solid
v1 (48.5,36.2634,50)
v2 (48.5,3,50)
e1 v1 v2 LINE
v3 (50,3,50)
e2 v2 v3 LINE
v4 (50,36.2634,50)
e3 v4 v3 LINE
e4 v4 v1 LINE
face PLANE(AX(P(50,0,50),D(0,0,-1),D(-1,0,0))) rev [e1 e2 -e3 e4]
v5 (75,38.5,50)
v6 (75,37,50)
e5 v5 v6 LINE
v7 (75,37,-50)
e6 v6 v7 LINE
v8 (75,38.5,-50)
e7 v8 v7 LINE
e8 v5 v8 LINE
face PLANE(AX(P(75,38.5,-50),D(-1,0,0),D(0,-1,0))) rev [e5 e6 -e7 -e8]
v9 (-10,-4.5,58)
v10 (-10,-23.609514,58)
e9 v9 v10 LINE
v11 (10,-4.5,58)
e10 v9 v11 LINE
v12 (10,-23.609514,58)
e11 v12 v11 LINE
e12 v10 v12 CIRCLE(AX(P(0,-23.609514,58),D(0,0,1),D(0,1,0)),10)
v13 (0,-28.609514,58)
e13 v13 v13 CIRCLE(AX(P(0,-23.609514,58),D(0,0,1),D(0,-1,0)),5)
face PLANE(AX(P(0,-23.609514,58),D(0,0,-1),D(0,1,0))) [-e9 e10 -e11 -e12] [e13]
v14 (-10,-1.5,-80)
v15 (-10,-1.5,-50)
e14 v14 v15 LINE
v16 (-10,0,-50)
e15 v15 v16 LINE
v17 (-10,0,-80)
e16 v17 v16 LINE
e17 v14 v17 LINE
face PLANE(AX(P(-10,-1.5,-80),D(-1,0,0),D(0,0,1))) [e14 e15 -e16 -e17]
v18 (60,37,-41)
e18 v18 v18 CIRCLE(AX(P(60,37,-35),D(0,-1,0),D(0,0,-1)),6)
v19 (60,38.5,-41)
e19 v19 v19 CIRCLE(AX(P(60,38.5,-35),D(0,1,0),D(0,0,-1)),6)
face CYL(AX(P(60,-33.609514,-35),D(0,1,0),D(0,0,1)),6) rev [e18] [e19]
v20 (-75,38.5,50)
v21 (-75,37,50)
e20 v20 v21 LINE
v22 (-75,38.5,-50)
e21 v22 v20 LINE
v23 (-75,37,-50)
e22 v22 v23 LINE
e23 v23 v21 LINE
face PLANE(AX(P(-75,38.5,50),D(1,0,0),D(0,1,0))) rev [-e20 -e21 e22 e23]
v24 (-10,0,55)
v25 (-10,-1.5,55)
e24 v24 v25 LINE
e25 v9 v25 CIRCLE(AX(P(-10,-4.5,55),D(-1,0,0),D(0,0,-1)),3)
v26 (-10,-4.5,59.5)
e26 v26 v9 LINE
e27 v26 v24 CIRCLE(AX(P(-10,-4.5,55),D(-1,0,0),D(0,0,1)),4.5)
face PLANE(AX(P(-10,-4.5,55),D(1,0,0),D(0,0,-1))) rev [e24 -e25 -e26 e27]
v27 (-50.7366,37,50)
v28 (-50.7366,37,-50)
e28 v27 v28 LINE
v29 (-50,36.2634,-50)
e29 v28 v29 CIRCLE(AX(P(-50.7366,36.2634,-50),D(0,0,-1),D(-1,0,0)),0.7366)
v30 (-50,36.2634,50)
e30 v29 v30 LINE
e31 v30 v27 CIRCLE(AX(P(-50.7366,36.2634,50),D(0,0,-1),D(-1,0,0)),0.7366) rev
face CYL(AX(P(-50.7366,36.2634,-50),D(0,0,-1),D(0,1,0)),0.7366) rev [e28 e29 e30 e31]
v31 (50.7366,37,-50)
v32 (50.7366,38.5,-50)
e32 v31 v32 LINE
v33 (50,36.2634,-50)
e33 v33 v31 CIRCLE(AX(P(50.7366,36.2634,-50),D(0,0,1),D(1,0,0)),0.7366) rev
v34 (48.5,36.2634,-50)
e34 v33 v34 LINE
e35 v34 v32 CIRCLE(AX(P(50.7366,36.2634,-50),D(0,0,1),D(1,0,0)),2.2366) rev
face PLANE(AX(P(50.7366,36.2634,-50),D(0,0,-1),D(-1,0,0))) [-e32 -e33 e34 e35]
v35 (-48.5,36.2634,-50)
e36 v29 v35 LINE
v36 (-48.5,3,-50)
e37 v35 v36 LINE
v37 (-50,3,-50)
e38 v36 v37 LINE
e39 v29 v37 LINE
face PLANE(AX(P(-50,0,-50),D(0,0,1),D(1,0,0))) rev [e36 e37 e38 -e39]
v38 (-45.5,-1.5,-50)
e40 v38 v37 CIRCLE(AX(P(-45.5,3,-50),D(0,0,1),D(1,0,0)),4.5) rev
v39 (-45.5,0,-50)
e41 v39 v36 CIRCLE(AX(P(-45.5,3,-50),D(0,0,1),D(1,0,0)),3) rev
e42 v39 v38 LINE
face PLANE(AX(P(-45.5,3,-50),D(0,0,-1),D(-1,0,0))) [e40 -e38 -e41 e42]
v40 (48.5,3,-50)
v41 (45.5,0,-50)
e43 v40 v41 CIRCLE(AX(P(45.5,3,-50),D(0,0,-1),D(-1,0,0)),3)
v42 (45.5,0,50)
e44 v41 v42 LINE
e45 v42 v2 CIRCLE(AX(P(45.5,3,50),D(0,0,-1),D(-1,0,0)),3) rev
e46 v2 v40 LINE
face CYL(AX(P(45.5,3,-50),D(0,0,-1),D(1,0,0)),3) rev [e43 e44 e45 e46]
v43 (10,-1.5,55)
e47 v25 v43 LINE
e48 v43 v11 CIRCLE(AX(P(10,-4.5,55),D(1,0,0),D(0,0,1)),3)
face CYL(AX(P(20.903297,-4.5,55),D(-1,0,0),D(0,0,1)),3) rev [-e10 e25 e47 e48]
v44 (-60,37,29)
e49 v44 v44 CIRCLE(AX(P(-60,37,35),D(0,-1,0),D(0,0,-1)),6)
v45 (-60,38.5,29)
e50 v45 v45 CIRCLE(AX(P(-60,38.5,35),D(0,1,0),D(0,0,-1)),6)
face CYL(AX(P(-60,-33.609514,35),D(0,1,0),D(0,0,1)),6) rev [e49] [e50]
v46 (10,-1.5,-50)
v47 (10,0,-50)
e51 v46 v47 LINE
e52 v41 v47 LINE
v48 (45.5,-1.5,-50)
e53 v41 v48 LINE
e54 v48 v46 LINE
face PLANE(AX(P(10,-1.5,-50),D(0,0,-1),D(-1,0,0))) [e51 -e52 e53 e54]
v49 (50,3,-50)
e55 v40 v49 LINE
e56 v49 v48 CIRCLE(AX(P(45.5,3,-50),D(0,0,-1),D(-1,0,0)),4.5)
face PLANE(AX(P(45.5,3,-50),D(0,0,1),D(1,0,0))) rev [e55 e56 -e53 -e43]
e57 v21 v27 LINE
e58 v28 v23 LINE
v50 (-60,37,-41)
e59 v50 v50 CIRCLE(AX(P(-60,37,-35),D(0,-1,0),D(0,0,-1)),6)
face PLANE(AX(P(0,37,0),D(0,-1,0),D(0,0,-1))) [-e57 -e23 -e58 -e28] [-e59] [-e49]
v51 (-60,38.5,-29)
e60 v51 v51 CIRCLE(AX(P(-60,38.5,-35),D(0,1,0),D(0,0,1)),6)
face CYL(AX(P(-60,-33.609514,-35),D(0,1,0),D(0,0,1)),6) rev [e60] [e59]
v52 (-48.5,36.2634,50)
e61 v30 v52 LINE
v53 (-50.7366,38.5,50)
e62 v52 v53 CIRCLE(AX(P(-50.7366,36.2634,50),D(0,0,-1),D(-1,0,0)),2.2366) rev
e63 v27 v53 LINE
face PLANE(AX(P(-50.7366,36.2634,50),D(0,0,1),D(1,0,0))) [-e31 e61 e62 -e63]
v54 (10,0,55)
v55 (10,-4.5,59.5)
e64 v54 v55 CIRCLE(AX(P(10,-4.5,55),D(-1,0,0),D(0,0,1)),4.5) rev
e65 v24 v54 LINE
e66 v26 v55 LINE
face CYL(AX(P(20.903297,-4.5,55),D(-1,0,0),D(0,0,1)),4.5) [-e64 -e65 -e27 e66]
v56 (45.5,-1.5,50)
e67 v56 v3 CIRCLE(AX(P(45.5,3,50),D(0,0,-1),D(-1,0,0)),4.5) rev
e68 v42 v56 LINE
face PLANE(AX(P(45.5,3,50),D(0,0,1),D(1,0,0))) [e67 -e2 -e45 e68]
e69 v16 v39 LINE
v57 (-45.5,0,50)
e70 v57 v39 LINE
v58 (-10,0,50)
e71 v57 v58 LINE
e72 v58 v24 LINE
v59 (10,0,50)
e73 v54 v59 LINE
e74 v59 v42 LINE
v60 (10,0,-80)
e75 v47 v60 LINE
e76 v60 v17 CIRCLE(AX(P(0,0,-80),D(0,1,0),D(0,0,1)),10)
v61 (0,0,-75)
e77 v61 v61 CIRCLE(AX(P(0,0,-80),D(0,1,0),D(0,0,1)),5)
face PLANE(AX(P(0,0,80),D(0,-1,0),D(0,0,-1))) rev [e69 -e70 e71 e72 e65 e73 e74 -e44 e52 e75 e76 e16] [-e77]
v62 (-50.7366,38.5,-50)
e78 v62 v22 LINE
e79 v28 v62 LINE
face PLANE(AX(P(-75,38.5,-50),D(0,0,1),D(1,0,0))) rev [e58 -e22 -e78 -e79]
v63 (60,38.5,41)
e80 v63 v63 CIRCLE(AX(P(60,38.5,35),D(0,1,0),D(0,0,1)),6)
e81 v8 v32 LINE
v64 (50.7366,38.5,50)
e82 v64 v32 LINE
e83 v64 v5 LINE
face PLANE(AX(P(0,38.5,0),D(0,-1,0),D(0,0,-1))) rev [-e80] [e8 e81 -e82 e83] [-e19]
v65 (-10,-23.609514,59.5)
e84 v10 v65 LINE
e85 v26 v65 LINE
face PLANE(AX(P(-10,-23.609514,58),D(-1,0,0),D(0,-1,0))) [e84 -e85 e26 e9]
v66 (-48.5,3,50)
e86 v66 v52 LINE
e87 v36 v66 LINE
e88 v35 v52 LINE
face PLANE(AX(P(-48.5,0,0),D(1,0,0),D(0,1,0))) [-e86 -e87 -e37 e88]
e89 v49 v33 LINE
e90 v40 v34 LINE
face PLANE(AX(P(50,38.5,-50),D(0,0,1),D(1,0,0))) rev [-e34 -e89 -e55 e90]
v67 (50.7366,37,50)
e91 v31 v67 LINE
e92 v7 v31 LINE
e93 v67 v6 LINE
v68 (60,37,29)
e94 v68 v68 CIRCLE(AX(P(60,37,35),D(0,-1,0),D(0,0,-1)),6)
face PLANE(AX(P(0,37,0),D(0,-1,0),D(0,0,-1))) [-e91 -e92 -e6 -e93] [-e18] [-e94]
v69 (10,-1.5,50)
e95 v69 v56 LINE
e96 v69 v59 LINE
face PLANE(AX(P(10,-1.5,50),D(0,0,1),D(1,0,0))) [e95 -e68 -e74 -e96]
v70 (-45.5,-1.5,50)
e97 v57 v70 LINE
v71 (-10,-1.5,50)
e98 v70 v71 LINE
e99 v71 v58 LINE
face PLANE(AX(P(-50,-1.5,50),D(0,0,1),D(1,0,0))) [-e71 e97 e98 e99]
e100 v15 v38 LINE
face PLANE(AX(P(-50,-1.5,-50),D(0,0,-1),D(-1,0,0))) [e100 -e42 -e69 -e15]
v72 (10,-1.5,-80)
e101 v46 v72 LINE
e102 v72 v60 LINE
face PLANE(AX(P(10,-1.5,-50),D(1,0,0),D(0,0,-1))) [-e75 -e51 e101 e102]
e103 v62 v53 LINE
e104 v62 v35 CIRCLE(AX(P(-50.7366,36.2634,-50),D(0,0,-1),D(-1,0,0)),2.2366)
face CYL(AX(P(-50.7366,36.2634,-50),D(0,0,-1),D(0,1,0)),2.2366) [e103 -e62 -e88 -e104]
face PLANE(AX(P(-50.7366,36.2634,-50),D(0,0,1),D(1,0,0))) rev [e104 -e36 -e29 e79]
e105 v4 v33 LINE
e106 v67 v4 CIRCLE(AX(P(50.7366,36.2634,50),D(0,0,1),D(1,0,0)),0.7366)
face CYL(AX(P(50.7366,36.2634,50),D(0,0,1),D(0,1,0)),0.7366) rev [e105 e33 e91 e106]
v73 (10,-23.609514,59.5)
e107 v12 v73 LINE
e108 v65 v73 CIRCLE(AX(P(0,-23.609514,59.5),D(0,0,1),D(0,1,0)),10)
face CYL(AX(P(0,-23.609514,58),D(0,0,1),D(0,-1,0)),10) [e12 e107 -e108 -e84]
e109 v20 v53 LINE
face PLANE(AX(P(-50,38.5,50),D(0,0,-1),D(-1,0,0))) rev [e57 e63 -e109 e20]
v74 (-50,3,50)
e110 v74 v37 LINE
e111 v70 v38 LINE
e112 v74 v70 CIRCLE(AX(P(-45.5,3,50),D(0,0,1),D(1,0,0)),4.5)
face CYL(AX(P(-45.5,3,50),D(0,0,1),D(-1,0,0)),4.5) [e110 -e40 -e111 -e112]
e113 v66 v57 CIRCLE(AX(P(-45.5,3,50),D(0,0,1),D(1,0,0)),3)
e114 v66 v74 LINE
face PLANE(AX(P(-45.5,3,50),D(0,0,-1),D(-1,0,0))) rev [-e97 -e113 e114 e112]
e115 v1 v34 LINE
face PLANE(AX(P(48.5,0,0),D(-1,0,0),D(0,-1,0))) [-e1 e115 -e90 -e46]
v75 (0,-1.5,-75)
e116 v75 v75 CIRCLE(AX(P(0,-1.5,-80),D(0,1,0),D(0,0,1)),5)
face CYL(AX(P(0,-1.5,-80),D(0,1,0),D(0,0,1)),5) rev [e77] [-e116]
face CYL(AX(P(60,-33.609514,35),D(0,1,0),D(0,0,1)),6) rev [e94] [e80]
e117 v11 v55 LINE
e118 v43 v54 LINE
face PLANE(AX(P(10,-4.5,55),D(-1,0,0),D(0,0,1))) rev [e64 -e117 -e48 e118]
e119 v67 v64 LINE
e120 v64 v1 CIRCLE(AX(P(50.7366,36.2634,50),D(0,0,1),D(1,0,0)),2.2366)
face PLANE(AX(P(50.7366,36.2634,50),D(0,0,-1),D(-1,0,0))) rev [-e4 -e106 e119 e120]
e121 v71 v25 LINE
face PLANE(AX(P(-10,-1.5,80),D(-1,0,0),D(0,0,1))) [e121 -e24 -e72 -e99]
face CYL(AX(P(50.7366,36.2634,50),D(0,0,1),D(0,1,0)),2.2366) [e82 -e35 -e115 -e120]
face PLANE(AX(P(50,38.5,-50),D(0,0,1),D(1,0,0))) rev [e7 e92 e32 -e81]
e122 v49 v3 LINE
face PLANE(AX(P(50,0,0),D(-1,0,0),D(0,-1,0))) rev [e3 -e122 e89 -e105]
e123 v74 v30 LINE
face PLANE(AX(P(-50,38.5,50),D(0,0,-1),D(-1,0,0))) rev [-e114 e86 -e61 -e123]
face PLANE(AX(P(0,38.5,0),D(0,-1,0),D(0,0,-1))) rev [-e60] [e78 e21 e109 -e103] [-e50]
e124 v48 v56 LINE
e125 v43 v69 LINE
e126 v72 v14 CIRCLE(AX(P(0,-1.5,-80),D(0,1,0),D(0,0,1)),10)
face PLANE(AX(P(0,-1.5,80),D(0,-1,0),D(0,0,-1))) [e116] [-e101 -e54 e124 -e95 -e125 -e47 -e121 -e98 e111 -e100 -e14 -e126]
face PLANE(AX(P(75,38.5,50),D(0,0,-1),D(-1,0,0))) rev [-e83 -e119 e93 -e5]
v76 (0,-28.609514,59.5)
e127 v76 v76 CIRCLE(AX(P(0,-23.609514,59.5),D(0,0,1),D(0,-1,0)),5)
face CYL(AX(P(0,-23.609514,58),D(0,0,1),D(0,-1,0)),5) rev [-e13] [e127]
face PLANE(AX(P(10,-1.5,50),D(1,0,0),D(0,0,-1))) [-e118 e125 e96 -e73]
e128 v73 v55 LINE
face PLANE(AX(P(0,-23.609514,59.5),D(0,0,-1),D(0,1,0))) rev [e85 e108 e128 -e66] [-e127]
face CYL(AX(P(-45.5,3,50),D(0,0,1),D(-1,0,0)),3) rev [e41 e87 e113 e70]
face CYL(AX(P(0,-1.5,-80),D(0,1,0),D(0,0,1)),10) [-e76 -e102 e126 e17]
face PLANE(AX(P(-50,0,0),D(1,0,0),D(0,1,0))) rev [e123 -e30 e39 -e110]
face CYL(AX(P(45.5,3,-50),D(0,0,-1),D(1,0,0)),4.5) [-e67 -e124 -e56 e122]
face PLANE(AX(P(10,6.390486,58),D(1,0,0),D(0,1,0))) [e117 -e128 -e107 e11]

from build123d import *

# Parameters (mm, degrees)
SCHIZZO1_R                           = 5
BASE_FLANGIA1_DEPTH                  = 1.5
BORDO_FLANGIA1_STRIP_W               = 12
BORDO_FLANGIA1_STRIP_H               = 1.5
BORDO_FLANGIA1_STRIP_CUT_DEPTH       = 100
BORDO_FLANGIA1_STRIP_2_W             = 12
BORDO_FLANGIA1_STRIP_2_H             = 1.5
BORDO_FLANGIA1_STRIP_CUT_2_DEPTH     = 100
BORDO_FLANGIA1_DEPTH                 = 100
BORDO_FLANGIA1_BEND_DEPTH            = 100
BORDO_FLANGIA2_STRIP_W               = 7.4732
BORDO_FLANGIA2_STRIP_H               = 1.5
BORDO_FLANGIA2_STRIP_CUT_DEPTH       = 100
BORDO_FLANGIA2_STRIP_2_W             = 7.4732
BORDO_FLANGIA2_STRIP_2_H             = 1.5
BORDO_FLANGIA2_STRIP_CUT_2_DEPTH     = 100
BORDO_FLANGIA2_DEPTH                 = 100
BORDO_FLANGIA2_BEND_DEPTH            = 100
PIEGATURA_START                      = 58.9178
PIEGATURA_DELLO_SCHIZZO1_OUTLINE_W   = 20
PIEGATURA_DELLO_SCHIZZO1_OUTLINE_H   = 1.5
PIEGATURA_DELLO_SCHIZZO1_DEPTH       = 32.0822
PIEGATURA_START_2                    = 56.266894772
PIEGATURA_DELLO_SCHIZZO1_2_OUTLINE_R = 5
PIEGATURA_DELLO_SCHIZZO1_2_DEPTH     = 3.233105228
PIEGATURA_START_3                    = -10
PIEGATURA_DELLO_SCHIZZO1_3_DEPTH     = 20
PIEGATURA_DELLO_SCHIZZO1_4_DEPTH     = 20
SCHIZZO19_R                          = 6
TAGLIO_ESTRUSIONE1_DEPTH             = 138.567372501


with BuildPart() as part:
    # Base-Flangia1: sheet metal written as solids
    # Schizzo1 → Base-Flangia1 (new body)
    with BuildSketch(Plane(origin=(0, 0, 0), x_dir=(1, 0, 0), z_dir=(0, 1, 0))):
        with BuildLine():
            Line((10, 50), (10, 80))
            ThreePointArc((10, 80), (0, 90), (-10, 80))
            Line((-10, 80), (-10, 50))
            Line((-10, 50), (-50, 50))
            Line((-50, 50), (-50, -50))
            Line((-50, -50), (-10, -50))
            Line((-10, -50), (-10, -80))
            ThreePointArc((-10, -80), (0, -90), (10, -80))
            Line((10, -80), (10, -50))
            Line((10, -50), (50, -50))
            Line((50, -50), (50, 50))
            Line((50, 50), (10, 50))
        make_face()
        with Locations(Location((0, 80, 0), (0, 0, 270))):
            Circle(SCHIZZO1_R, mode=Mode.SUBTRACT)
        with Locations(Location((0, -80, 0), (0, 0, 270))):
            Circle(SCHIZZO1_R, mode=Mode.SUBTRACT)
    extrude(amount=-BASE_FLANGIA1_DEPTH)

    # Bordo-Flangia1: sheet metal written as solids
    # Bordo-Flangia1 strip (on a plane across the edge) → Bordo-Flangia1 strip cut (cut)
    with BuildSketch(Plane(origin=(-50, 0, -50), x_dir=(1, 0, 0), z_dir=(0, 0, 1))):
        with Locations((-1.5, -0.75)):
            Rectangle(BORDO_FLANGIA1_STRIP_W, BORDO_FLANGIA1_STRIP_H)
    extrude(amount=BORDO_FLANGIA1_STRIP_CUT_DEPTH, mode=Mode.SUBTRACT)

    # Bordo-Flangia1 strip 2 (on a plane across the edge) → Bordo-Flangia1 strip cut 2 (cut)
    with BuildSketch(Plane(origin=(50, 0, 50), x_dir=(-1, 0, 0), z_dir=(0, 0, -1))):
        with Locations((-1.5, -0.75)):
            Rectangle(BORDO_FLANGIA1_STRIP_2_W, BORDO_FLANGIA1_STRIP_2_H)
    extrude(amount=BORDO_FLANGIA1_STRIP_CUT_2_DEPTH, mode=Mode.SUBTRACT)

    # Bordo-Flangia1 section (on a plane across the edge) → Bordo-Flangia1 (add)
    with BuildSketch(Plane(origin=(-50, 0, -50), x_dir=(1, 0, 0), z_dir=(0, 0, 1))):
        with BuildLine():
            Line((0, 3), (0, 38.5))
            Line((0, 38.5), (1.5, 38.5))
            Line((1.5, 38.5), (1.5, 3))
            ThreePointArc((1.5, 3), (2.378679656, 0.878679656), (4.5, 0))
            Line((4.5, 0), (4.5, -1.5))
            ThreePointArc((4.5, -1.5), (1.318019485, -0.181980515), (0, 3))
        make_face()
    extrude(amount=BORDO_FLANGIA1_DEPTH)

    # Bordo-Flangia1 section 2 (on a plane across the edge) → Bordo-Flangia1 bend (add)
    with BuildSketch(Plane(origin=(50, 0, 50), x_dir=(-1, 0, 0), z_dir=(0, 0, -1))):
        with BuildLine():
            Line((0, 3), (0, 38.5))
            Line((0, 38.5), (1.5, 38.5))
            Line((1.5, 38.5), (1.5, 3))
            ThreePointArc((1.5, 3), (2.378679656, 0.878679656), (4.5, 0))
            Line((4.5, 0), (4.5, -1.5))
            ThreePointArc((4.5, -1.5), (1.318019485, -0.181980515), (0, 3))
        make_face()
    extrude(amount=BORDO_FLANGIA1_BEND_DEPTH)

    # Bordo-Flangia2: sheet metal written as solids
    # Bordo-Flangia2 strip (on a plane across the edge) → Bordo-Flangia2 strip cut (cut)
    with BuildSketch(Plane(origin=(50, 38.5, -50), x_dir=(0, -1, 0), z_dir=(0, 0, 1))):
        with Locations((-1.5, -0.75)):
            Rectangle(BORDO_FLANGIA2_STRIP_W, BORDO_FLANGIA2_STRIP_H)
    extrude(amount=BORDO_FLANGIA2_STRIP_CUT_DEPTH, mode=Mode.SUBTRACT)

    # Bordo-Flangia2 strip 2 (on a plane across the edge) → Bordo-Flangia2 strip cut 2 (cut)
    with BuildSketch(Plane(origin=(-50, 38.5, 50), x_dir=(0, -1, 0), z_dir=(0, 0, -1))):
        with Locations((-1.5, -0.75)):
            Rectangle(BORDO_FLANGIA2_STRIP_2_W, BORDO_FLANGIA2_STRIP_2_H)
    extrude(amount=BORDO_FLANGIA2_STRIP_CUT_2_DEPTH, mode=Mode.SUBTRACT)

    # Bordo-Flangia2 section (on a plane across the edge) → Bordo-Flangia2 (add)
    with BuildSketch(Plane(origin=(50, 38.5, -50), x_dir=(0, -1, 0), z_dir=(0, 0, 1))):
        with BuildLine():
            Line((0, 0.7366), (0, 25))
            Line((0, 25), (1.5, 25))
            Line((1.5, 25), (1.5, 0.7366))
            ThreePointArc((1.5, 0.7366), (1.715745145, 0.215745145), (2.2366, 0))
            Line((2.2366, 0), (2.2366, -1.5))
            ThreePointArc((2.2366, -1.5), (0.655084973, -0.844915027), (0, 0.7366))
        make_face()
    extrude(amount=BORDO_FLANGIA2_DEPTH)

    # Bordo-Flangia2 section 2 (on a plane across the edge) → Bordo-Flangia2 bend (add)
    with BuildSketch(Plane(origin=(-50, 38.5, 50), x_dir=(0, -1, 0), z_dir=(0, 0, -1))):
        with BuildLine():
            Line((0, 0.7366), (0, 25))
            Line((0, 25), (1.5, 25))
            Line((1.5, 25), (1.5, 0.7366))
            ThreePointArc((1.5, 0.7366), (1.715745145, 0.215745145), (2.2366, 0))
            Line((2.2366, 0), (2.2366, -1.5))
            ThreePointArc((2.2366, -1.5), (0.655084973, -0.844915027), (0, 0.7366))
        make_face()
    extrude(amount=BORDO_FLANGIA2_BEND_DEPTH)

    # Piegatura dello schizzo1: read off the stored shape, not the designer's step
    # Piegatura dello schizzo1 outline → Piegatura dello schizzo1 (cut)
    with BuildSketch(Plane.XY.offset(PIEGATURA_START)):
        with Locations((0, -0.75)):
            Rectangle(PIEGATURA_DELLO_SCHIZZO1_OUTLINE_W, PIEGATURA_DELLO_SCHIZZO1_OUTLINE_H)
    extrude(amount=PIEGATURA_DELLO_SCHIZZO1_DEPTH, mode=Mode.SUBTRACT)

    # Piegatura dello schizzo1 2 outline → Piegatura dello schizzo1 2 (add)
    with BuildSketch(Plane.XY.offset(PIEGATURA_START_2)):
        with BuildLine():
            Line((10, -23.609513775), (10, -1.5))
            Line((10, -1.5), (-10, -1.5))
            Line((-10, -1.5), (-10, -23.609513775))
            ThreePointArc((-10, -23.609513775), (0, -33.609513775), (10, -23.609513775))
        make_face()
        with Locations((0, -23.609513775)):
            Circle(PIEGATURA_DELLO_SCHIZZO1_2_OUTLINE_R, mode=Mode.SUBTRACT)
    extrude(amount=PIEGATURA_DELLO_SCHIZZO1_2_DEPTH)

    # Piegatura dello schizzo1 3 outline → Piegatura dello schizzo1 3 (cut)
    with BuildSketch(Plane.YZ.offset(PIEGATURA_START_3)):
        with BuildLine():
            ThreePointArc((-1.780629183, 56.266894772), (-2.887654552, 57.529889753), (-4.5, 58))
            Line((-4.5, 58), (-35, 58))
            Line((-35, 58), (-35, 56.266894772))
            Line((-35, 56.266894772), (-1.780629183, 56.266894772))
        make_face()
        with BuildLine():
            Line((1, 54), (1, 58.9178))
            Line((1, 58.9178), (-1.5, 58.9178))
            Line((-1.5, 58.9178), (-1.5, 61))
            Line((-1.5, 61), (-35, 61))
            Line((-35, 61), (-35, 59.500000008))
            Line((-35, 59.500000008), (-4.5, 59.5))
            ThreePointArc((-4.5, 59.5), (-1.318019485, 58.181980515), (0, 55))
            Line((0, 55), (0, 54))
            Line((0, 54), (1, 54))
        make_face()
    extrude(amount=PIEGATURA_DELLO_SCHIZZO1_3_DEPTH, mode=Mode.SUBTRACT)

    # Piegatura dello schizzo1 4 outline → Piegatura dello schizzo1 4 (add)
    with BuildSketch(Plane.YZ.offset(PIEGATURA_START_3)):
        with BuildLine():
            Line((-0.182016948, 56.266894772), (-1.780629183, 56.266894772))
            ThreePointArc((-1.780629183, 56.266894772), (-1.570997401, 55.6488018), (-1.5, 55))
            Line((-1.5, 55), (-1.500000001, 54))
            Line((-1.500000001, 54), (0, 54))
            Line((0, 54), (0, 55))
            ThreePointArc((0, 55), (-0.045736664, 55.639951665), (-0.182016948, 56.266894772))
        make_face()
    extrude(amount=PIEGATURA_DELLO_SCHIZZO1_4_DEPTH)

    # Schizzo19 → Taglio-Estrusione1 (cut, through all)
    with BuildSketch(Plane(origin=(0, 38.5, 0), x_dir=(1, 0, 0), z_dir=(0, 1, 0))):
        with Locations(Location((-60, 35, 0), (0, 0, 270))):
            Circle(SCHIZZO19_R)
        with Locations(Location((-60, -35, 0), (0, 0, 90))):
            Circle(SCHIZZO19_R)
        with Locations(Location((60, -35, 0), (0, 0, 270))):
            Circle(SCHIZZO19_R)
        with Locations(Location((60, 35, 0), (0, 0, 90))):
            Circle(SCHIZZO19_R)
    extrude(amount=-TAGLIO_ESTRUSIONE1_DEPTH, mode=Mode.SUBTRACT)


solid = part.part
